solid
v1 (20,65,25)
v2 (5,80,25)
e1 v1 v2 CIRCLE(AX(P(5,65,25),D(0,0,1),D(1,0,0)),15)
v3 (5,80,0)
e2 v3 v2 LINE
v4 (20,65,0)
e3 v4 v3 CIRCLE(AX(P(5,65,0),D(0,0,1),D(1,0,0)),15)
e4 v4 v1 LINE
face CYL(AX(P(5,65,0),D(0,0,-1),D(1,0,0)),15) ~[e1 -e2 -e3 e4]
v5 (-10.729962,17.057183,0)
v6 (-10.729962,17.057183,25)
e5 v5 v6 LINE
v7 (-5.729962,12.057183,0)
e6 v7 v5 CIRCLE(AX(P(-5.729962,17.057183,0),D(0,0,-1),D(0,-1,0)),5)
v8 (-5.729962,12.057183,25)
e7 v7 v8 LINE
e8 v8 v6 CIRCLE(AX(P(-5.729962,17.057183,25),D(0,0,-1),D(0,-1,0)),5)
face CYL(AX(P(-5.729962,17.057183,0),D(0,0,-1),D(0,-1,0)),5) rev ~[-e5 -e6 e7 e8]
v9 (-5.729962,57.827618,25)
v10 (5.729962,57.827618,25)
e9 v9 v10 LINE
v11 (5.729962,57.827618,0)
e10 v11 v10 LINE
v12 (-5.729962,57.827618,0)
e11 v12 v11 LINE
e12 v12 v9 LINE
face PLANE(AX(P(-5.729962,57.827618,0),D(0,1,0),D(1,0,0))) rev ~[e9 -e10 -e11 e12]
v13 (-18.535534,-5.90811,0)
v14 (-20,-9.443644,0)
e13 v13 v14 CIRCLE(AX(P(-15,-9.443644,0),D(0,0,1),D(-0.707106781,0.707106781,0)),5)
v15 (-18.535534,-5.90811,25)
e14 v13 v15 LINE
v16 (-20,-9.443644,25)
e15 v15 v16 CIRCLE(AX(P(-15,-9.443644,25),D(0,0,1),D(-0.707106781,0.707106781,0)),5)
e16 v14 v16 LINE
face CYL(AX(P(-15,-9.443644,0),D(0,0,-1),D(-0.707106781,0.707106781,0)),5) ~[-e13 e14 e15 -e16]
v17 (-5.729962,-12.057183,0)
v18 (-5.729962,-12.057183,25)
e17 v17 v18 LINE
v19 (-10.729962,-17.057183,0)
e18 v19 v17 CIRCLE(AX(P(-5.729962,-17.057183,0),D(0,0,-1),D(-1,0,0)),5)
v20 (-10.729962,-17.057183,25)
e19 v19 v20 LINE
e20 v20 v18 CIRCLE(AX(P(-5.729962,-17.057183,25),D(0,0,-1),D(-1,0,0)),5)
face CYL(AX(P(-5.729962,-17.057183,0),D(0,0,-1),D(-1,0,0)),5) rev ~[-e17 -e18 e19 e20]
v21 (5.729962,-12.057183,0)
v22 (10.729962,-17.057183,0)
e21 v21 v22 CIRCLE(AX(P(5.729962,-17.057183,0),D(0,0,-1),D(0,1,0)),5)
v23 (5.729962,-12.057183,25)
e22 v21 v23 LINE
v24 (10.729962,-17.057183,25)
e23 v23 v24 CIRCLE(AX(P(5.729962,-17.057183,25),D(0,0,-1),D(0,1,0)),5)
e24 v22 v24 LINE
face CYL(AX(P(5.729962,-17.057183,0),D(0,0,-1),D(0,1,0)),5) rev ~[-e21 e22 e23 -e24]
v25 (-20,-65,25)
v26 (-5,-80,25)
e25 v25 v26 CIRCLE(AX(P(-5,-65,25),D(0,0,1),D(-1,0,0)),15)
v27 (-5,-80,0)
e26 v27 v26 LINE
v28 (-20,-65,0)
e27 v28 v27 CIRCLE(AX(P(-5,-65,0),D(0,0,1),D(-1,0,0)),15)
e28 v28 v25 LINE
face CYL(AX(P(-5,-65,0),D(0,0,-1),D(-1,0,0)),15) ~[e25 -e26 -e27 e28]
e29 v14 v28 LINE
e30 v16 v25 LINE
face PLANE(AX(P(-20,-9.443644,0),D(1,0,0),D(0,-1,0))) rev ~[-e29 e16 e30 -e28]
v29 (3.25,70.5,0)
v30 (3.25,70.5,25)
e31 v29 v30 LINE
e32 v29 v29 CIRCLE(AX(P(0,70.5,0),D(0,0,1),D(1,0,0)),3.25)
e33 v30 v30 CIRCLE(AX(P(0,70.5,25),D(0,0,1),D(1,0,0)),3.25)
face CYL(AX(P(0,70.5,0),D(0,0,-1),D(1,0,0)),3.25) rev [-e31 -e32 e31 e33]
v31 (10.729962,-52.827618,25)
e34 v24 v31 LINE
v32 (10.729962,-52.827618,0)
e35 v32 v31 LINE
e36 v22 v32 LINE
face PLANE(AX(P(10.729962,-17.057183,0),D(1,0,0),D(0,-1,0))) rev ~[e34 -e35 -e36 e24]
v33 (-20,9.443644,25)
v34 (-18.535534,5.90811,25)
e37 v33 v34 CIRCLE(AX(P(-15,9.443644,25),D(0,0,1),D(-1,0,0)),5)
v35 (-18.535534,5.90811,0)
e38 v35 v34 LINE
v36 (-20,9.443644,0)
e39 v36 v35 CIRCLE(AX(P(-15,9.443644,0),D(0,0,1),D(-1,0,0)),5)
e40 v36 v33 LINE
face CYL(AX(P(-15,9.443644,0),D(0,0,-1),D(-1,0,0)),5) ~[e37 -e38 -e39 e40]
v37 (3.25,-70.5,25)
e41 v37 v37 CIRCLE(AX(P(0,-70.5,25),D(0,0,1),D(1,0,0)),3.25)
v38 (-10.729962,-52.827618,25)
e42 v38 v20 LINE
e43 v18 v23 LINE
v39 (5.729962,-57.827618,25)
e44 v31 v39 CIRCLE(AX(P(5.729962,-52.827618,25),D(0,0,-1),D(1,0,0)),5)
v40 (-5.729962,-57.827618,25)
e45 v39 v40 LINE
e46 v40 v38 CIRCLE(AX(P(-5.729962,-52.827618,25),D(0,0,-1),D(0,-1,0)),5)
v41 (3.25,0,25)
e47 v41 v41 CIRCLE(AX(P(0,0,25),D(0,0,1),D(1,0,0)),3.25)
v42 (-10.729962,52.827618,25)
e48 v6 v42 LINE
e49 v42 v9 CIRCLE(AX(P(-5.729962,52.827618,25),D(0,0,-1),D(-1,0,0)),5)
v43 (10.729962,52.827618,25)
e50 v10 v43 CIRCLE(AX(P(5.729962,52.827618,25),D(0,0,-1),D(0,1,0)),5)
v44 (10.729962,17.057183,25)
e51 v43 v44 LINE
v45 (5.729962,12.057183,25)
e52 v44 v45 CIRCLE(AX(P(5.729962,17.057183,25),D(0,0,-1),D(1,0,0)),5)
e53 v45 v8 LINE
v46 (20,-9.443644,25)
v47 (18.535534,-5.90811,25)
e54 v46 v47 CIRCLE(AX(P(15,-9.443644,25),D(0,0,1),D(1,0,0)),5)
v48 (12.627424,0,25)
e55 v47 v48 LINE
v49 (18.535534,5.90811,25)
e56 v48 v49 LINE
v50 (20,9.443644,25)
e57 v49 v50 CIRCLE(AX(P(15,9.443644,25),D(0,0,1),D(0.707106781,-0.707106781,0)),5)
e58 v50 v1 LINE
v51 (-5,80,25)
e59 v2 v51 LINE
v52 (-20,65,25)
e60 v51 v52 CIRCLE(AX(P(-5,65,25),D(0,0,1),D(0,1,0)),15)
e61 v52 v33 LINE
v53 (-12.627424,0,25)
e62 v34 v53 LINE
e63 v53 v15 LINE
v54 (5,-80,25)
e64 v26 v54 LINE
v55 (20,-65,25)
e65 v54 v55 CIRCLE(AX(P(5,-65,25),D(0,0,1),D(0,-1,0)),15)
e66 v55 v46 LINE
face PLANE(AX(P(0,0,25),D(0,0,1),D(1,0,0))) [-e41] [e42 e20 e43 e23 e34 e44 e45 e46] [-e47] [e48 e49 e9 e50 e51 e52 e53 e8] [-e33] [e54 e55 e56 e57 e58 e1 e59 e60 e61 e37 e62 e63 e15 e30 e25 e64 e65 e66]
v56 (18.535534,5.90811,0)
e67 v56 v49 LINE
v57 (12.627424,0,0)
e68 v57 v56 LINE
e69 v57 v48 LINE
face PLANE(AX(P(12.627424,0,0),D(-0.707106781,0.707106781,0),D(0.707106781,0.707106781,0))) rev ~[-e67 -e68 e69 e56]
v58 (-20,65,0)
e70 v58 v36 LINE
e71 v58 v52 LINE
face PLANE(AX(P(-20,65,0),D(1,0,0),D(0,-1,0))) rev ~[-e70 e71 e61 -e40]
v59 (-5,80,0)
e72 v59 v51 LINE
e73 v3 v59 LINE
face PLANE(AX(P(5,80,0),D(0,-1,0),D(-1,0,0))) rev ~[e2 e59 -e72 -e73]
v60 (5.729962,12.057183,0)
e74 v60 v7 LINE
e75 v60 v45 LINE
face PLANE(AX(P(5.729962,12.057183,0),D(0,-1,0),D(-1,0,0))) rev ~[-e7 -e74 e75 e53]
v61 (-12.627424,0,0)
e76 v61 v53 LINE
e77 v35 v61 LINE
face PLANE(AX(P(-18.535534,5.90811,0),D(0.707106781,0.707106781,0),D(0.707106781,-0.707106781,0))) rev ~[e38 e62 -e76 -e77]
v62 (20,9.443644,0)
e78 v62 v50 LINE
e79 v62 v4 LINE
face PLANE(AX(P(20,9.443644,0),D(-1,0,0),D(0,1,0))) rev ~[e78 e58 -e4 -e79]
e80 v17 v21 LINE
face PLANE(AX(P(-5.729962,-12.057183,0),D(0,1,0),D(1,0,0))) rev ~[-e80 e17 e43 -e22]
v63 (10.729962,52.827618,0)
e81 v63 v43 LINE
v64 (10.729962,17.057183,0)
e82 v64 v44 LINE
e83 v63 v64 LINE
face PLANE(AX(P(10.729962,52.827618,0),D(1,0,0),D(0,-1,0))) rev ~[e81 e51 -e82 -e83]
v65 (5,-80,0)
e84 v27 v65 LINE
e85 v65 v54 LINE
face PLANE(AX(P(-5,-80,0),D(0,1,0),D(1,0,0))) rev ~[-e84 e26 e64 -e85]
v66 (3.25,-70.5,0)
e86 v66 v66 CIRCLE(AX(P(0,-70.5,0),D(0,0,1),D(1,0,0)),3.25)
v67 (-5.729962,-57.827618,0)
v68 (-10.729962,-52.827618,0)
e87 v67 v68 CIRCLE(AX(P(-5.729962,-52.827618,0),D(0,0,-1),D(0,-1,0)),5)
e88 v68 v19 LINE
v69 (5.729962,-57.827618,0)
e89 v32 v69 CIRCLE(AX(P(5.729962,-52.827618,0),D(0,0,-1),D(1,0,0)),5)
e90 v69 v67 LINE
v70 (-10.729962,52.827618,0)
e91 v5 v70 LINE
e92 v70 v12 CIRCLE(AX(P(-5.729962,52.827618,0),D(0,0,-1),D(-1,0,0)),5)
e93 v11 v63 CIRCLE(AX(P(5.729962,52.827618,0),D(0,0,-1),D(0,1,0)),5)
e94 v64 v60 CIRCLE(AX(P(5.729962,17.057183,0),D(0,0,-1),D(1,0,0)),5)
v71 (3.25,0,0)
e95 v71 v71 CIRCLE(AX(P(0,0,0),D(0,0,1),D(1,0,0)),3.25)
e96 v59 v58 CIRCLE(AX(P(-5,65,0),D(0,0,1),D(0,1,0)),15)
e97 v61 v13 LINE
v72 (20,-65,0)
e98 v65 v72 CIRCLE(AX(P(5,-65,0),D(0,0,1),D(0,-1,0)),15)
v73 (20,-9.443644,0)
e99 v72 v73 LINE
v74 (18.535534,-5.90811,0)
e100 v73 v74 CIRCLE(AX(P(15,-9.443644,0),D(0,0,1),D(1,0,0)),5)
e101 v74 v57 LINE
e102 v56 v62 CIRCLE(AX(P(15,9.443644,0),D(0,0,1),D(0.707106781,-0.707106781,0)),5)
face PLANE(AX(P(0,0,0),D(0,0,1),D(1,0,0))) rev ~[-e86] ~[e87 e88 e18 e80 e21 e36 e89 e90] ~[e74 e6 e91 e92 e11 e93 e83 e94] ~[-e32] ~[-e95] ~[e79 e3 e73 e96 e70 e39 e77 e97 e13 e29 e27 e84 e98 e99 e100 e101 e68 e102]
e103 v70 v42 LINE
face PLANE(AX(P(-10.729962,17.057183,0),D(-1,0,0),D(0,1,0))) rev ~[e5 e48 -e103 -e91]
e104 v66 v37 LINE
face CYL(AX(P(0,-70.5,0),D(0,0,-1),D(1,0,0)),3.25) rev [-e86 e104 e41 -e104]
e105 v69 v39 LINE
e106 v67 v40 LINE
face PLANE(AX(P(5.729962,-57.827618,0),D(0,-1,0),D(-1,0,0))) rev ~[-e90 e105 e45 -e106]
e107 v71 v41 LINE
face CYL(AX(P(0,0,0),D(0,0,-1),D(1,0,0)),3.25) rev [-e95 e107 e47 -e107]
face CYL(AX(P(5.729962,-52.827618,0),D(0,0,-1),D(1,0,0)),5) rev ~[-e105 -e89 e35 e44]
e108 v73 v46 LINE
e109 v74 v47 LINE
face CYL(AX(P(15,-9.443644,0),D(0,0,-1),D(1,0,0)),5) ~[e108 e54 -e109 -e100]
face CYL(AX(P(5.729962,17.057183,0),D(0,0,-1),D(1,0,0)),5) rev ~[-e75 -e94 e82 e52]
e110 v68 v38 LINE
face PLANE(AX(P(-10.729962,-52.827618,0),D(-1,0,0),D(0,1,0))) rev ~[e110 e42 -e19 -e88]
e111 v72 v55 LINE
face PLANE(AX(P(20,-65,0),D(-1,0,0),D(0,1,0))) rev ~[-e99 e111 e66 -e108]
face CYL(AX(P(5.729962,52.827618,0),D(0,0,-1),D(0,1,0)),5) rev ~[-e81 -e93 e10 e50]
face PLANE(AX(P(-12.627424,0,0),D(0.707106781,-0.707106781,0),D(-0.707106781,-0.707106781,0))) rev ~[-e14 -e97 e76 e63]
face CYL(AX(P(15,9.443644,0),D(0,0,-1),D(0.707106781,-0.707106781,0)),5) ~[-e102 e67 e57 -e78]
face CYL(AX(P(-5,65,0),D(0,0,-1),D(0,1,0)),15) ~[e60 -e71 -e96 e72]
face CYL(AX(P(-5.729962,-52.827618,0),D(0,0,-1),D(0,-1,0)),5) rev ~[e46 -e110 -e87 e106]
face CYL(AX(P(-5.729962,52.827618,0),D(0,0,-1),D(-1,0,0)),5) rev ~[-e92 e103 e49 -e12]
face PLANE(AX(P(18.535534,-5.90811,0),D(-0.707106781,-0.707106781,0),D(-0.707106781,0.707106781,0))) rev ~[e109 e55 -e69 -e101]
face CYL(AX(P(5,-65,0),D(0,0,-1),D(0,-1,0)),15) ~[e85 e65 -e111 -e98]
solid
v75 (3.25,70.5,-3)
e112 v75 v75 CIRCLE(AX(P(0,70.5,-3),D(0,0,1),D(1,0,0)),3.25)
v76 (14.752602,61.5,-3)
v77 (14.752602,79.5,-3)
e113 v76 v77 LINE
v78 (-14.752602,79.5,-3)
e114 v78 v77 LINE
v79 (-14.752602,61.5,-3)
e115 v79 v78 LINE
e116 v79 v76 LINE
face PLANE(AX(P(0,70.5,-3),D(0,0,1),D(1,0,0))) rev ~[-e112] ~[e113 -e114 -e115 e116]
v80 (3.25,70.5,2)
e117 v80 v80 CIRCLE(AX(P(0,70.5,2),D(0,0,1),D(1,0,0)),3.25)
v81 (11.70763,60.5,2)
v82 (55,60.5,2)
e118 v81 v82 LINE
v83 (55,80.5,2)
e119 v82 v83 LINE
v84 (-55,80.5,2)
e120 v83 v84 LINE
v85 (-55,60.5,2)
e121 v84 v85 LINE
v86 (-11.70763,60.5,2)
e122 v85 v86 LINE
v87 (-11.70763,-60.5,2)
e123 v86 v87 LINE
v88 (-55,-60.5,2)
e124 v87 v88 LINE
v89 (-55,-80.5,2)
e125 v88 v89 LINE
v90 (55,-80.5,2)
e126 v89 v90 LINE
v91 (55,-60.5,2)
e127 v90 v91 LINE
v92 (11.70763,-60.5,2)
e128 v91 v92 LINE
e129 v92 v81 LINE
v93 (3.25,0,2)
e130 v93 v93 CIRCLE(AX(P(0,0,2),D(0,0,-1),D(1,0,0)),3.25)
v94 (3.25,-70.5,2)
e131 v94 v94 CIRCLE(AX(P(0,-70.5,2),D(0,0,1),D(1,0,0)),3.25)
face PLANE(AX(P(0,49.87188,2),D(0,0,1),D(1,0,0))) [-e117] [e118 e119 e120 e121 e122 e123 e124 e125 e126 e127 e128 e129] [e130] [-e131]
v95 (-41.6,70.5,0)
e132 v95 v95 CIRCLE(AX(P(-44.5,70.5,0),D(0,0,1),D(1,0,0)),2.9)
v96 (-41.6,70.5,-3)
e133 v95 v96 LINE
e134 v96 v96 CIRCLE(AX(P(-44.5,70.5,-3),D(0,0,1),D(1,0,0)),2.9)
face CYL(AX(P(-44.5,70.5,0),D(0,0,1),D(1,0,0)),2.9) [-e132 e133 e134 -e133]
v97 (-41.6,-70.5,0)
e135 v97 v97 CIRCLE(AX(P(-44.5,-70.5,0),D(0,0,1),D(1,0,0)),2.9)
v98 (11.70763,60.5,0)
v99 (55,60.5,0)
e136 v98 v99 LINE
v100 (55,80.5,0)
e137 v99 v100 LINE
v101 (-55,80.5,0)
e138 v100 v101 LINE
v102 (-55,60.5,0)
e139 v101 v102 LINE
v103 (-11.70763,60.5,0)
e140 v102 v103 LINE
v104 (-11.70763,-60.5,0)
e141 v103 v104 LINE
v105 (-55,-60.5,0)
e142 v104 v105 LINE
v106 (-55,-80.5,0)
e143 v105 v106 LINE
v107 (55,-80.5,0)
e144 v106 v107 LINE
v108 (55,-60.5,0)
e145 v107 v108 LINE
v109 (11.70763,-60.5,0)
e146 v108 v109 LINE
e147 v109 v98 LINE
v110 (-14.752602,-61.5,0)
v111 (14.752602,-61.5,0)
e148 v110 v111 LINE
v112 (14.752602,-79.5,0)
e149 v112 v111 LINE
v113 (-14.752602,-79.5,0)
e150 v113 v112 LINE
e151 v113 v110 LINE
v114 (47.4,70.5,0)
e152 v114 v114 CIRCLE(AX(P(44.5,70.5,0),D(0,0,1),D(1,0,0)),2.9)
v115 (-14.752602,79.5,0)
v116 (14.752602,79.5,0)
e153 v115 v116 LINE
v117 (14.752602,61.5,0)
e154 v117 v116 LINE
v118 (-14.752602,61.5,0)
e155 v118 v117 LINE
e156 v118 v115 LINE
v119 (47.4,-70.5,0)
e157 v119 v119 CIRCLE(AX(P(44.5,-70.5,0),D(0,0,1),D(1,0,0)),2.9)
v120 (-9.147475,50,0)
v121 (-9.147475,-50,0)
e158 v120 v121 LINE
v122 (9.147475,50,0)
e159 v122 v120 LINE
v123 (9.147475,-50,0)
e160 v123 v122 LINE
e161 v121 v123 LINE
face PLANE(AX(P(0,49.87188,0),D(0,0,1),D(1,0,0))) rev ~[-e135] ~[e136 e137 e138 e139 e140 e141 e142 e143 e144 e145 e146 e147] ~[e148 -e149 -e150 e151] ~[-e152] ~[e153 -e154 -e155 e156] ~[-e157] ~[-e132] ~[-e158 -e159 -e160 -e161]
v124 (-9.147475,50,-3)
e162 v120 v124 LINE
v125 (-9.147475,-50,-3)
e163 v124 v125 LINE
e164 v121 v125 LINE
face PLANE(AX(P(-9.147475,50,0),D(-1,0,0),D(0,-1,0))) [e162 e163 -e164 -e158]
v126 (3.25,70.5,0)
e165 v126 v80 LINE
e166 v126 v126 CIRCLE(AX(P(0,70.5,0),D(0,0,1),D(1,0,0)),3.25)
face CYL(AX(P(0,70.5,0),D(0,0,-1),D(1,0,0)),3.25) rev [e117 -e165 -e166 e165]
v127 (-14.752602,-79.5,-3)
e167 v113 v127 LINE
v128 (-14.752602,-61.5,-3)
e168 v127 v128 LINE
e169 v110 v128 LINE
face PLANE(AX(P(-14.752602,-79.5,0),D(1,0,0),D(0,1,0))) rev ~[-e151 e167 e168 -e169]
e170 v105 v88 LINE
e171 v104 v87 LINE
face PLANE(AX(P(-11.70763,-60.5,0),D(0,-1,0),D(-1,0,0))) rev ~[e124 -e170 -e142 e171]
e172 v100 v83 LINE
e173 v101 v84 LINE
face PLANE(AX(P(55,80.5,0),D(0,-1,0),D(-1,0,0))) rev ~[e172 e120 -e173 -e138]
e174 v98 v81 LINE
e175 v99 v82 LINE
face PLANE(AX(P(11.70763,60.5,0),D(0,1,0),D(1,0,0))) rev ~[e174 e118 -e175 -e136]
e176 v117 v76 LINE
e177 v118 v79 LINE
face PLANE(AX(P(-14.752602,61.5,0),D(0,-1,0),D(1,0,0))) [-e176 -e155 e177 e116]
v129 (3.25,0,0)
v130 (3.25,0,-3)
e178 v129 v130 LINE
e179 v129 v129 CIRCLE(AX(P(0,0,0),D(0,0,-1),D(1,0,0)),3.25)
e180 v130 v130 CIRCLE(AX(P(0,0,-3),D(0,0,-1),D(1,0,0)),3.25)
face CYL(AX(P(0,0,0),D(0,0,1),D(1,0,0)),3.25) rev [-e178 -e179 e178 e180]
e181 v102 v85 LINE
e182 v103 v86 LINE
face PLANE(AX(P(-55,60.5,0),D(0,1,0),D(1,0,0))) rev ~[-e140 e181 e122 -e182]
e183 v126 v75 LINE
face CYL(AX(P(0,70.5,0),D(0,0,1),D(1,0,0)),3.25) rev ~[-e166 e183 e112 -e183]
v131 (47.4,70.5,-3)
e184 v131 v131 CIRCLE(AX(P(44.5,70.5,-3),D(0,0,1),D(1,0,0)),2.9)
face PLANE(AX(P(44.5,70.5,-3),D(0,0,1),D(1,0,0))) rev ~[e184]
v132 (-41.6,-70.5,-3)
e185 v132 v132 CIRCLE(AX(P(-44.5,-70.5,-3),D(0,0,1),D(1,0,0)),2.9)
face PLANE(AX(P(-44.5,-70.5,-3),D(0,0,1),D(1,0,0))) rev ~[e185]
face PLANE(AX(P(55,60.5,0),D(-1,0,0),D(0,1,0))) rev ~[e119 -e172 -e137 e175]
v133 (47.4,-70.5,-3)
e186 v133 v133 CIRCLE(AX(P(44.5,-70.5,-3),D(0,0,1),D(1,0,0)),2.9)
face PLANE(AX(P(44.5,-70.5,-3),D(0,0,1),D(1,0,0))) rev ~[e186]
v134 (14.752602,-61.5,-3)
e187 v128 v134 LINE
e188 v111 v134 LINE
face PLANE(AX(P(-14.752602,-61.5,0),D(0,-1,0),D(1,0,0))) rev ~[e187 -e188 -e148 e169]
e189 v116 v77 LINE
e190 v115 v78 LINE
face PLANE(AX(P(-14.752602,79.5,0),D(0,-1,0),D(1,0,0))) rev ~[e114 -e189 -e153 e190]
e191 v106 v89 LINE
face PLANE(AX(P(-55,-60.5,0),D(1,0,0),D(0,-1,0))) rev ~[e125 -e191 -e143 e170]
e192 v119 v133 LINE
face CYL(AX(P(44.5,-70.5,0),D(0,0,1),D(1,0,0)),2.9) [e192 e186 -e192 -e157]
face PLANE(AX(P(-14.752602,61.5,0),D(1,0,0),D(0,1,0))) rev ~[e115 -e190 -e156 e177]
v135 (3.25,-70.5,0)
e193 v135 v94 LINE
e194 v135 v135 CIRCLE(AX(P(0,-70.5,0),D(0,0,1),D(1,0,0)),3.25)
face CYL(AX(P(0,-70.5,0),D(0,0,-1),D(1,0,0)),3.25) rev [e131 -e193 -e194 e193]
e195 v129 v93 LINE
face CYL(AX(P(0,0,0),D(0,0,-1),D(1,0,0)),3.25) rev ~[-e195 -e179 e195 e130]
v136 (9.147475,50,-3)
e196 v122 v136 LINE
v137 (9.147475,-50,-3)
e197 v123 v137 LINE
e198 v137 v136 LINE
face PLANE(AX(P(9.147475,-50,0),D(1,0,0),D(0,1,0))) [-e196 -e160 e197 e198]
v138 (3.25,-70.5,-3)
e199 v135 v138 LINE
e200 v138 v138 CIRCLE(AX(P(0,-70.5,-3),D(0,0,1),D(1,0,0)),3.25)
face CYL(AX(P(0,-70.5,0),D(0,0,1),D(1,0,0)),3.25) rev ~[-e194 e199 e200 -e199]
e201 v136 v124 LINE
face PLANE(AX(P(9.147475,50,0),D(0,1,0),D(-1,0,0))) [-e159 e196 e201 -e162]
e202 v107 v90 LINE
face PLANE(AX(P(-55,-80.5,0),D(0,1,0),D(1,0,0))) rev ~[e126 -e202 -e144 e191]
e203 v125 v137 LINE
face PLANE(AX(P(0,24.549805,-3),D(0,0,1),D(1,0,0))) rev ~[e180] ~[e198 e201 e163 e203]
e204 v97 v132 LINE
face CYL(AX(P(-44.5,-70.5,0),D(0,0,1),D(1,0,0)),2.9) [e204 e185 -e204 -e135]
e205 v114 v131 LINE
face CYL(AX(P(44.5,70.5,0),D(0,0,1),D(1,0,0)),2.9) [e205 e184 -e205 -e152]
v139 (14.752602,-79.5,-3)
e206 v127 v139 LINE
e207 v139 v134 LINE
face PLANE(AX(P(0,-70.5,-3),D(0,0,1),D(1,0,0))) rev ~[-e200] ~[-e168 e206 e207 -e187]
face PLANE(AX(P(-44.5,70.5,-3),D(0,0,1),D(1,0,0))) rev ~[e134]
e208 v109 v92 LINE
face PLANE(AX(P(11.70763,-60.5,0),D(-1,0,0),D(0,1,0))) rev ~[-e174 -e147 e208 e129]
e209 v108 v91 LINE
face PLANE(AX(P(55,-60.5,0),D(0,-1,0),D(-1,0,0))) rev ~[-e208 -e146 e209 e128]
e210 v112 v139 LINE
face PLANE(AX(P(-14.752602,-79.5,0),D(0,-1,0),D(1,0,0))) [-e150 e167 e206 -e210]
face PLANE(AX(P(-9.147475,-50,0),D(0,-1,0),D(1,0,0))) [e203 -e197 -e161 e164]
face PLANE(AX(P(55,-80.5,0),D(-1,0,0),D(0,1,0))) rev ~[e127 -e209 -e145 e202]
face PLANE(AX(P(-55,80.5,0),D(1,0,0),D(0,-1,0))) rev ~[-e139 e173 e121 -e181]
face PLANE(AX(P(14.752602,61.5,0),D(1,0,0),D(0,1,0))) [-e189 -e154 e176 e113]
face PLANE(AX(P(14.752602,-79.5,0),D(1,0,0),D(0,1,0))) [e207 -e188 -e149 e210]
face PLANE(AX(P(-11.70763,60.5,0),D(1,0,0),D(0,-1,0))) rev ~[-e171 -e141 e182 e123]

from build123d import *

# Parameters (mm, degrees)
F0_R     = 2.9
F0_W     = 29.5052044094
F0_H     = 18
F0_R_2   = 3.25
F1_DEPTH = 2
F2_DEPTH = 3
F3_R     = 3.25
F4_DEPTH = 25


# Not quite as in the source:
# - a feature names something its author has since deleted; it is built from what else it names


with BuildPart() as f1:
    # F0 (on Top) → F1 (new body)
    with BuildSketch(Plane.XY):
        Polygon((55, 80.5), (-55, 80.5), (-55, 60.5), (-11.7076300085, 60.5), (-11.7076300085, 0), (-9.1474745423, 0), (-9.1474745423, 50), (9.1474745423, 50), (9.1474745423, 0), (11.7076300085, 0), (11.7076300085, 60.5), (55, 60.5), align=None)
        with Locations((-44.5, 70.5)):
            Circle(F0_R, mode=Mode.SUBTRACT)
        with Locations((0, 70.5)):
            Rectangle(F0_W, F0_H, mode=Mode.SUBTRACT)
        with Locations((44.5, 70.5)):
            Circle(F0_R, mode=Mode.SUBTRACT)
        Polygon((-9.1474745423, 0), (-11.7076300085, 0), (-11.7076300085, -60.5), (-55, -60.5), (-55, -80.5), (55, -80.5), (55, -60.5), (11.7076300085, -60.5), (11.7076300085, -10), (11.7076300085, 0), (9.1474745423, 0), (9.1474745423, -50), (-9.1474745423, -50), align=None)
        with Locations((-44.5, -70.5)):
            Circle(F0_R, mode=Mode.SUBTRACT)
        with Locations((0, -70.5)):
            Rectangle(F0_W, F0_H, mode=Mode.SUBTRACT)
        with Locations((44.5, -70.5)):
            Circle(F0_R, mode=Mode.SUBTRACT)
        with Locations((44.5, 70.5)):
            Circle(F0_R)
        with Locations((-44.5, 70.5)):
            Circle(F0_R)
        with Locations((-44.5, -70.5)):
            Circle(F0_R)
        with Locations((44.5, -70.5)):
            Circle(F0_R)
        with Locations((0, 70.5)):
            Rectangle(F0_W, F0_H)
        with Locations((0, 70.5)):
            Circle(F0_R_2, mode=Mode.SUBTRACT)
        with Locations((0, -70.5)):
            Rectangle(F0_W, F0_H)
        with Locations((0, -70.5)):
            Circle(F0_R_2, mode=Mode.SUBTRACT)
        with BuildLine():
            Line((-9.1474745423, 50), (-9.1474745423, 0))
            Line((-9.1474745423, 0), (-3.25, 0))
            ThreePointArc((-3.25, 0), (0, 3.25), (3.25, 0))
            Line((3.25, 0), (9.1474745423, 0))
            Line((9.1474745423, 0), (9.1474745423, 50))
            Line((9.1474745423, 50), (-9.1474745423, 50))
        make_face()
        with BuildLine():
            Line((-3.25, 0), (-9.1474745423, 0))
            Line((-9.1474745423, 0), (-9.1474745423, -50))
            Line((-9.1474745423, -50), (9.1474745423, -50))
            Line((9.1474745423, -50), (9.1474745423, 0))
            Line((9.1474745423, 0), (3.25, 0))
            ThreePointArc((3.25, 0), (0, -3.25), (-3.25, 0))
        make_face()
    extrude(amount=F1_DEPTH)

    # F0 (on Top) → F2 (join)
    with BuildSketch(Plane.XY):
        with Locations((44.5, 70.5)):
            Circle(F0_R)
        with Locations((-44.5, 70.5)):
            Circle(F0_R)
        with Locations((44.5, -70.5)):
            Circle(F0_R)
        with Locations((-44.5, -70.5)):
            Circle(F0_R)
        with Locations((0, 70.5)):
            Rectangle(F0_W, F0_H)
        with Locations((0, 70.5)):
            Circle(F0_R_2, mode=Mode.SUBTRACT)
        with Locations((0, -70.5)):
            Rectangle(F0_W, F0_H)
        with Locations((0, -70.5)):
            Circle(F0_R_2, mode=Mode.SUBTRACT)
        with BuildLine():
            Line((-9.1474745423, 50), (-9.1474745423, 0))
            Line((-9.1474745423, 0), (-3.25, 0))
            ThreePointArc((-3.25, 0), (0, 3.25), (3.25, 0))
            Line((3.25, 0), (9.1474745423, 0))
            Line((9.1474745423, 0), (9.1474745423, 50))
            Line((9.1474745423, 50), (-9.1474745423, 50))
        make_face()
        with BuildLine():
            Line((-3.25, 0), (-9.1474745423, 0))
            Line((-9.1474745423, 0), (-9.1474745423, -50))
            Line((-9.1474745423, -50), (9.1474745423, -50))
            Line((9.1474745423, -50), (9.1474745423, 0))
            Line((9.1474745423, 0), (3.25, 0))
            ThreePointArc((3.25, 0), (0, -3.25), (-3.25, 0))
        make_face()
    extrude(amount=-F2_DEPTH)


with BuildPart() as f4:
    # F3 (on Top) → F4 (new body)
    with BuildSketch(Plane.XY):
        with BuildLine():
            ThreePointArc((-5, 80), (-15.6066017178, 75.6066017178), (-20, 65))
            Line((-20, 65), (-20, 9.4436440896))
            ThreePointArc((-20, 9.4436440896), (-19.6193976626, 7.5302269277), (-18.5355339059, 5.9081101836))
            Line((-18.5355339059, 5.9081101836), (-12.6274237223, 0))
            Line((-12.6274237223, 0), (-18.5355339059, -5.9081101836))
            ThreePointArc((-18.5355339059, -5.9081101836), (-19.6193976626, -7.5302269277), (-20, -9.4436440896))
            Line((-20, -9.4436440896), (-20, -65))
            ThreePointArc((-20, -65), (-15.6066017178, -75.6066017178), (-5, -80))
            Line((-5, -80), (5, -80))
            ThreePointArc((5, -80), (15.6066017178, -75.6066017178), (20, -65))
            Line((20, -65), (20, -9.4436440896))
            ThreePointArc((20, -9.4436440896), (19.6193976626, -7.5302269277), (18.5355339059, -5.9081101836))
            Line((18.5355339059, -5.9081101836), (12.6274237223, 0))
            Line((12.6274237223, 0), (18.5355339059, 5.9081101836))
            ThreePointArc((18.5355339059, 5.9081101836), (19.6193976626, 7.5302269277), (20, 9.4436440896))
            Line((20, 9.4436440896), (20, 65))
            ThreePointArc((20, 65), (15.6066017178, 75.6066017178), (5, 80))
            Line((5, 80), (-5, 80))
        make_face()
        with BuildLine():
            Line((10.7299620286, -17.0571833104), (10.7299620286, -52.8276179731))
            ThreePointArc((10.7299620286, -52.8276179731), (9.2654959345, -56.363151879), (5.7299620286, -57.8276179731))
            Line((5.7299620286, -57.8276179731), (-5.7299620286, -57.8276179731))
            ThreePointArc((-5.7299620286, -57.8276179731), (-9.2654959345, -56.363151879), (-10.7299620286, -52.8276179731))
            Line((-10.7299620286, -52.8276179731), (-10.7299620286, -17.0571833104))
            ThreePointArc((-10.7299620286, -17.0571833104), (-9.2654959345, -13.5216494045), (-5.7299620286, -12.0571833104))
            Line((-5.7299620286, -12.0571833104), (5.7299620286, -12.0571833104))
            ThreePointArc((5.7299620286, -12.0571833104), (9.2654959345, -13.5216494045), (10.7299620286, -17.0571833104))
        make_face(mode=Mode.SUBTRACT)
        with Locations((0, -70.5)):
            Circle(F3_R, mode=Mode.SUBTRACT)
        Circle(F3_R, mode=Mode.SUBTRACT)
        with BuildLine():
            ThreePointArc((-10.7299620286, 52.8276179731), (-9.2654959345, 56.363151879), (-5.7299620286, 57.8276179731))
            Line((-5.7299620286, 57.8276179731), (5.7299620286, 57.8276179731))
            ThreePointArc((5.7299620286, 57.8276179731), (9.2654959345, 56.363151879), (10.7299620286, 52.8276179731))
            Line((10.7299620286, 52.8276179731), (10.7299620286, 17.0571833104))
            ThreePointArc((10.7299620286, 17.0571833104), (9.2654959345, 13.5216494045), (5.7299620286, 12.0571833104))
            Line((5.7299620286, 12.0571833104), (-5.7299620286, 12.0571833104))
            ThreePointArc((-5.7299620286, 12.0571833104), (-9.2654959345, 13.5216494045), (-10.7299620286, 17.0571833104))
            Line((-10.7299620286, 17.0571833104), (-10.7299620286, 52.8276179731))
        make_face(mode=Mode.SUBTRACT)
        with Locations((0, 70.5)):
            Circle(F3_R, mode=Mode.SUBTRACT)
    extrude(amount=F4_DEPTH)


solid = Compound([f1.part, f4.part])
